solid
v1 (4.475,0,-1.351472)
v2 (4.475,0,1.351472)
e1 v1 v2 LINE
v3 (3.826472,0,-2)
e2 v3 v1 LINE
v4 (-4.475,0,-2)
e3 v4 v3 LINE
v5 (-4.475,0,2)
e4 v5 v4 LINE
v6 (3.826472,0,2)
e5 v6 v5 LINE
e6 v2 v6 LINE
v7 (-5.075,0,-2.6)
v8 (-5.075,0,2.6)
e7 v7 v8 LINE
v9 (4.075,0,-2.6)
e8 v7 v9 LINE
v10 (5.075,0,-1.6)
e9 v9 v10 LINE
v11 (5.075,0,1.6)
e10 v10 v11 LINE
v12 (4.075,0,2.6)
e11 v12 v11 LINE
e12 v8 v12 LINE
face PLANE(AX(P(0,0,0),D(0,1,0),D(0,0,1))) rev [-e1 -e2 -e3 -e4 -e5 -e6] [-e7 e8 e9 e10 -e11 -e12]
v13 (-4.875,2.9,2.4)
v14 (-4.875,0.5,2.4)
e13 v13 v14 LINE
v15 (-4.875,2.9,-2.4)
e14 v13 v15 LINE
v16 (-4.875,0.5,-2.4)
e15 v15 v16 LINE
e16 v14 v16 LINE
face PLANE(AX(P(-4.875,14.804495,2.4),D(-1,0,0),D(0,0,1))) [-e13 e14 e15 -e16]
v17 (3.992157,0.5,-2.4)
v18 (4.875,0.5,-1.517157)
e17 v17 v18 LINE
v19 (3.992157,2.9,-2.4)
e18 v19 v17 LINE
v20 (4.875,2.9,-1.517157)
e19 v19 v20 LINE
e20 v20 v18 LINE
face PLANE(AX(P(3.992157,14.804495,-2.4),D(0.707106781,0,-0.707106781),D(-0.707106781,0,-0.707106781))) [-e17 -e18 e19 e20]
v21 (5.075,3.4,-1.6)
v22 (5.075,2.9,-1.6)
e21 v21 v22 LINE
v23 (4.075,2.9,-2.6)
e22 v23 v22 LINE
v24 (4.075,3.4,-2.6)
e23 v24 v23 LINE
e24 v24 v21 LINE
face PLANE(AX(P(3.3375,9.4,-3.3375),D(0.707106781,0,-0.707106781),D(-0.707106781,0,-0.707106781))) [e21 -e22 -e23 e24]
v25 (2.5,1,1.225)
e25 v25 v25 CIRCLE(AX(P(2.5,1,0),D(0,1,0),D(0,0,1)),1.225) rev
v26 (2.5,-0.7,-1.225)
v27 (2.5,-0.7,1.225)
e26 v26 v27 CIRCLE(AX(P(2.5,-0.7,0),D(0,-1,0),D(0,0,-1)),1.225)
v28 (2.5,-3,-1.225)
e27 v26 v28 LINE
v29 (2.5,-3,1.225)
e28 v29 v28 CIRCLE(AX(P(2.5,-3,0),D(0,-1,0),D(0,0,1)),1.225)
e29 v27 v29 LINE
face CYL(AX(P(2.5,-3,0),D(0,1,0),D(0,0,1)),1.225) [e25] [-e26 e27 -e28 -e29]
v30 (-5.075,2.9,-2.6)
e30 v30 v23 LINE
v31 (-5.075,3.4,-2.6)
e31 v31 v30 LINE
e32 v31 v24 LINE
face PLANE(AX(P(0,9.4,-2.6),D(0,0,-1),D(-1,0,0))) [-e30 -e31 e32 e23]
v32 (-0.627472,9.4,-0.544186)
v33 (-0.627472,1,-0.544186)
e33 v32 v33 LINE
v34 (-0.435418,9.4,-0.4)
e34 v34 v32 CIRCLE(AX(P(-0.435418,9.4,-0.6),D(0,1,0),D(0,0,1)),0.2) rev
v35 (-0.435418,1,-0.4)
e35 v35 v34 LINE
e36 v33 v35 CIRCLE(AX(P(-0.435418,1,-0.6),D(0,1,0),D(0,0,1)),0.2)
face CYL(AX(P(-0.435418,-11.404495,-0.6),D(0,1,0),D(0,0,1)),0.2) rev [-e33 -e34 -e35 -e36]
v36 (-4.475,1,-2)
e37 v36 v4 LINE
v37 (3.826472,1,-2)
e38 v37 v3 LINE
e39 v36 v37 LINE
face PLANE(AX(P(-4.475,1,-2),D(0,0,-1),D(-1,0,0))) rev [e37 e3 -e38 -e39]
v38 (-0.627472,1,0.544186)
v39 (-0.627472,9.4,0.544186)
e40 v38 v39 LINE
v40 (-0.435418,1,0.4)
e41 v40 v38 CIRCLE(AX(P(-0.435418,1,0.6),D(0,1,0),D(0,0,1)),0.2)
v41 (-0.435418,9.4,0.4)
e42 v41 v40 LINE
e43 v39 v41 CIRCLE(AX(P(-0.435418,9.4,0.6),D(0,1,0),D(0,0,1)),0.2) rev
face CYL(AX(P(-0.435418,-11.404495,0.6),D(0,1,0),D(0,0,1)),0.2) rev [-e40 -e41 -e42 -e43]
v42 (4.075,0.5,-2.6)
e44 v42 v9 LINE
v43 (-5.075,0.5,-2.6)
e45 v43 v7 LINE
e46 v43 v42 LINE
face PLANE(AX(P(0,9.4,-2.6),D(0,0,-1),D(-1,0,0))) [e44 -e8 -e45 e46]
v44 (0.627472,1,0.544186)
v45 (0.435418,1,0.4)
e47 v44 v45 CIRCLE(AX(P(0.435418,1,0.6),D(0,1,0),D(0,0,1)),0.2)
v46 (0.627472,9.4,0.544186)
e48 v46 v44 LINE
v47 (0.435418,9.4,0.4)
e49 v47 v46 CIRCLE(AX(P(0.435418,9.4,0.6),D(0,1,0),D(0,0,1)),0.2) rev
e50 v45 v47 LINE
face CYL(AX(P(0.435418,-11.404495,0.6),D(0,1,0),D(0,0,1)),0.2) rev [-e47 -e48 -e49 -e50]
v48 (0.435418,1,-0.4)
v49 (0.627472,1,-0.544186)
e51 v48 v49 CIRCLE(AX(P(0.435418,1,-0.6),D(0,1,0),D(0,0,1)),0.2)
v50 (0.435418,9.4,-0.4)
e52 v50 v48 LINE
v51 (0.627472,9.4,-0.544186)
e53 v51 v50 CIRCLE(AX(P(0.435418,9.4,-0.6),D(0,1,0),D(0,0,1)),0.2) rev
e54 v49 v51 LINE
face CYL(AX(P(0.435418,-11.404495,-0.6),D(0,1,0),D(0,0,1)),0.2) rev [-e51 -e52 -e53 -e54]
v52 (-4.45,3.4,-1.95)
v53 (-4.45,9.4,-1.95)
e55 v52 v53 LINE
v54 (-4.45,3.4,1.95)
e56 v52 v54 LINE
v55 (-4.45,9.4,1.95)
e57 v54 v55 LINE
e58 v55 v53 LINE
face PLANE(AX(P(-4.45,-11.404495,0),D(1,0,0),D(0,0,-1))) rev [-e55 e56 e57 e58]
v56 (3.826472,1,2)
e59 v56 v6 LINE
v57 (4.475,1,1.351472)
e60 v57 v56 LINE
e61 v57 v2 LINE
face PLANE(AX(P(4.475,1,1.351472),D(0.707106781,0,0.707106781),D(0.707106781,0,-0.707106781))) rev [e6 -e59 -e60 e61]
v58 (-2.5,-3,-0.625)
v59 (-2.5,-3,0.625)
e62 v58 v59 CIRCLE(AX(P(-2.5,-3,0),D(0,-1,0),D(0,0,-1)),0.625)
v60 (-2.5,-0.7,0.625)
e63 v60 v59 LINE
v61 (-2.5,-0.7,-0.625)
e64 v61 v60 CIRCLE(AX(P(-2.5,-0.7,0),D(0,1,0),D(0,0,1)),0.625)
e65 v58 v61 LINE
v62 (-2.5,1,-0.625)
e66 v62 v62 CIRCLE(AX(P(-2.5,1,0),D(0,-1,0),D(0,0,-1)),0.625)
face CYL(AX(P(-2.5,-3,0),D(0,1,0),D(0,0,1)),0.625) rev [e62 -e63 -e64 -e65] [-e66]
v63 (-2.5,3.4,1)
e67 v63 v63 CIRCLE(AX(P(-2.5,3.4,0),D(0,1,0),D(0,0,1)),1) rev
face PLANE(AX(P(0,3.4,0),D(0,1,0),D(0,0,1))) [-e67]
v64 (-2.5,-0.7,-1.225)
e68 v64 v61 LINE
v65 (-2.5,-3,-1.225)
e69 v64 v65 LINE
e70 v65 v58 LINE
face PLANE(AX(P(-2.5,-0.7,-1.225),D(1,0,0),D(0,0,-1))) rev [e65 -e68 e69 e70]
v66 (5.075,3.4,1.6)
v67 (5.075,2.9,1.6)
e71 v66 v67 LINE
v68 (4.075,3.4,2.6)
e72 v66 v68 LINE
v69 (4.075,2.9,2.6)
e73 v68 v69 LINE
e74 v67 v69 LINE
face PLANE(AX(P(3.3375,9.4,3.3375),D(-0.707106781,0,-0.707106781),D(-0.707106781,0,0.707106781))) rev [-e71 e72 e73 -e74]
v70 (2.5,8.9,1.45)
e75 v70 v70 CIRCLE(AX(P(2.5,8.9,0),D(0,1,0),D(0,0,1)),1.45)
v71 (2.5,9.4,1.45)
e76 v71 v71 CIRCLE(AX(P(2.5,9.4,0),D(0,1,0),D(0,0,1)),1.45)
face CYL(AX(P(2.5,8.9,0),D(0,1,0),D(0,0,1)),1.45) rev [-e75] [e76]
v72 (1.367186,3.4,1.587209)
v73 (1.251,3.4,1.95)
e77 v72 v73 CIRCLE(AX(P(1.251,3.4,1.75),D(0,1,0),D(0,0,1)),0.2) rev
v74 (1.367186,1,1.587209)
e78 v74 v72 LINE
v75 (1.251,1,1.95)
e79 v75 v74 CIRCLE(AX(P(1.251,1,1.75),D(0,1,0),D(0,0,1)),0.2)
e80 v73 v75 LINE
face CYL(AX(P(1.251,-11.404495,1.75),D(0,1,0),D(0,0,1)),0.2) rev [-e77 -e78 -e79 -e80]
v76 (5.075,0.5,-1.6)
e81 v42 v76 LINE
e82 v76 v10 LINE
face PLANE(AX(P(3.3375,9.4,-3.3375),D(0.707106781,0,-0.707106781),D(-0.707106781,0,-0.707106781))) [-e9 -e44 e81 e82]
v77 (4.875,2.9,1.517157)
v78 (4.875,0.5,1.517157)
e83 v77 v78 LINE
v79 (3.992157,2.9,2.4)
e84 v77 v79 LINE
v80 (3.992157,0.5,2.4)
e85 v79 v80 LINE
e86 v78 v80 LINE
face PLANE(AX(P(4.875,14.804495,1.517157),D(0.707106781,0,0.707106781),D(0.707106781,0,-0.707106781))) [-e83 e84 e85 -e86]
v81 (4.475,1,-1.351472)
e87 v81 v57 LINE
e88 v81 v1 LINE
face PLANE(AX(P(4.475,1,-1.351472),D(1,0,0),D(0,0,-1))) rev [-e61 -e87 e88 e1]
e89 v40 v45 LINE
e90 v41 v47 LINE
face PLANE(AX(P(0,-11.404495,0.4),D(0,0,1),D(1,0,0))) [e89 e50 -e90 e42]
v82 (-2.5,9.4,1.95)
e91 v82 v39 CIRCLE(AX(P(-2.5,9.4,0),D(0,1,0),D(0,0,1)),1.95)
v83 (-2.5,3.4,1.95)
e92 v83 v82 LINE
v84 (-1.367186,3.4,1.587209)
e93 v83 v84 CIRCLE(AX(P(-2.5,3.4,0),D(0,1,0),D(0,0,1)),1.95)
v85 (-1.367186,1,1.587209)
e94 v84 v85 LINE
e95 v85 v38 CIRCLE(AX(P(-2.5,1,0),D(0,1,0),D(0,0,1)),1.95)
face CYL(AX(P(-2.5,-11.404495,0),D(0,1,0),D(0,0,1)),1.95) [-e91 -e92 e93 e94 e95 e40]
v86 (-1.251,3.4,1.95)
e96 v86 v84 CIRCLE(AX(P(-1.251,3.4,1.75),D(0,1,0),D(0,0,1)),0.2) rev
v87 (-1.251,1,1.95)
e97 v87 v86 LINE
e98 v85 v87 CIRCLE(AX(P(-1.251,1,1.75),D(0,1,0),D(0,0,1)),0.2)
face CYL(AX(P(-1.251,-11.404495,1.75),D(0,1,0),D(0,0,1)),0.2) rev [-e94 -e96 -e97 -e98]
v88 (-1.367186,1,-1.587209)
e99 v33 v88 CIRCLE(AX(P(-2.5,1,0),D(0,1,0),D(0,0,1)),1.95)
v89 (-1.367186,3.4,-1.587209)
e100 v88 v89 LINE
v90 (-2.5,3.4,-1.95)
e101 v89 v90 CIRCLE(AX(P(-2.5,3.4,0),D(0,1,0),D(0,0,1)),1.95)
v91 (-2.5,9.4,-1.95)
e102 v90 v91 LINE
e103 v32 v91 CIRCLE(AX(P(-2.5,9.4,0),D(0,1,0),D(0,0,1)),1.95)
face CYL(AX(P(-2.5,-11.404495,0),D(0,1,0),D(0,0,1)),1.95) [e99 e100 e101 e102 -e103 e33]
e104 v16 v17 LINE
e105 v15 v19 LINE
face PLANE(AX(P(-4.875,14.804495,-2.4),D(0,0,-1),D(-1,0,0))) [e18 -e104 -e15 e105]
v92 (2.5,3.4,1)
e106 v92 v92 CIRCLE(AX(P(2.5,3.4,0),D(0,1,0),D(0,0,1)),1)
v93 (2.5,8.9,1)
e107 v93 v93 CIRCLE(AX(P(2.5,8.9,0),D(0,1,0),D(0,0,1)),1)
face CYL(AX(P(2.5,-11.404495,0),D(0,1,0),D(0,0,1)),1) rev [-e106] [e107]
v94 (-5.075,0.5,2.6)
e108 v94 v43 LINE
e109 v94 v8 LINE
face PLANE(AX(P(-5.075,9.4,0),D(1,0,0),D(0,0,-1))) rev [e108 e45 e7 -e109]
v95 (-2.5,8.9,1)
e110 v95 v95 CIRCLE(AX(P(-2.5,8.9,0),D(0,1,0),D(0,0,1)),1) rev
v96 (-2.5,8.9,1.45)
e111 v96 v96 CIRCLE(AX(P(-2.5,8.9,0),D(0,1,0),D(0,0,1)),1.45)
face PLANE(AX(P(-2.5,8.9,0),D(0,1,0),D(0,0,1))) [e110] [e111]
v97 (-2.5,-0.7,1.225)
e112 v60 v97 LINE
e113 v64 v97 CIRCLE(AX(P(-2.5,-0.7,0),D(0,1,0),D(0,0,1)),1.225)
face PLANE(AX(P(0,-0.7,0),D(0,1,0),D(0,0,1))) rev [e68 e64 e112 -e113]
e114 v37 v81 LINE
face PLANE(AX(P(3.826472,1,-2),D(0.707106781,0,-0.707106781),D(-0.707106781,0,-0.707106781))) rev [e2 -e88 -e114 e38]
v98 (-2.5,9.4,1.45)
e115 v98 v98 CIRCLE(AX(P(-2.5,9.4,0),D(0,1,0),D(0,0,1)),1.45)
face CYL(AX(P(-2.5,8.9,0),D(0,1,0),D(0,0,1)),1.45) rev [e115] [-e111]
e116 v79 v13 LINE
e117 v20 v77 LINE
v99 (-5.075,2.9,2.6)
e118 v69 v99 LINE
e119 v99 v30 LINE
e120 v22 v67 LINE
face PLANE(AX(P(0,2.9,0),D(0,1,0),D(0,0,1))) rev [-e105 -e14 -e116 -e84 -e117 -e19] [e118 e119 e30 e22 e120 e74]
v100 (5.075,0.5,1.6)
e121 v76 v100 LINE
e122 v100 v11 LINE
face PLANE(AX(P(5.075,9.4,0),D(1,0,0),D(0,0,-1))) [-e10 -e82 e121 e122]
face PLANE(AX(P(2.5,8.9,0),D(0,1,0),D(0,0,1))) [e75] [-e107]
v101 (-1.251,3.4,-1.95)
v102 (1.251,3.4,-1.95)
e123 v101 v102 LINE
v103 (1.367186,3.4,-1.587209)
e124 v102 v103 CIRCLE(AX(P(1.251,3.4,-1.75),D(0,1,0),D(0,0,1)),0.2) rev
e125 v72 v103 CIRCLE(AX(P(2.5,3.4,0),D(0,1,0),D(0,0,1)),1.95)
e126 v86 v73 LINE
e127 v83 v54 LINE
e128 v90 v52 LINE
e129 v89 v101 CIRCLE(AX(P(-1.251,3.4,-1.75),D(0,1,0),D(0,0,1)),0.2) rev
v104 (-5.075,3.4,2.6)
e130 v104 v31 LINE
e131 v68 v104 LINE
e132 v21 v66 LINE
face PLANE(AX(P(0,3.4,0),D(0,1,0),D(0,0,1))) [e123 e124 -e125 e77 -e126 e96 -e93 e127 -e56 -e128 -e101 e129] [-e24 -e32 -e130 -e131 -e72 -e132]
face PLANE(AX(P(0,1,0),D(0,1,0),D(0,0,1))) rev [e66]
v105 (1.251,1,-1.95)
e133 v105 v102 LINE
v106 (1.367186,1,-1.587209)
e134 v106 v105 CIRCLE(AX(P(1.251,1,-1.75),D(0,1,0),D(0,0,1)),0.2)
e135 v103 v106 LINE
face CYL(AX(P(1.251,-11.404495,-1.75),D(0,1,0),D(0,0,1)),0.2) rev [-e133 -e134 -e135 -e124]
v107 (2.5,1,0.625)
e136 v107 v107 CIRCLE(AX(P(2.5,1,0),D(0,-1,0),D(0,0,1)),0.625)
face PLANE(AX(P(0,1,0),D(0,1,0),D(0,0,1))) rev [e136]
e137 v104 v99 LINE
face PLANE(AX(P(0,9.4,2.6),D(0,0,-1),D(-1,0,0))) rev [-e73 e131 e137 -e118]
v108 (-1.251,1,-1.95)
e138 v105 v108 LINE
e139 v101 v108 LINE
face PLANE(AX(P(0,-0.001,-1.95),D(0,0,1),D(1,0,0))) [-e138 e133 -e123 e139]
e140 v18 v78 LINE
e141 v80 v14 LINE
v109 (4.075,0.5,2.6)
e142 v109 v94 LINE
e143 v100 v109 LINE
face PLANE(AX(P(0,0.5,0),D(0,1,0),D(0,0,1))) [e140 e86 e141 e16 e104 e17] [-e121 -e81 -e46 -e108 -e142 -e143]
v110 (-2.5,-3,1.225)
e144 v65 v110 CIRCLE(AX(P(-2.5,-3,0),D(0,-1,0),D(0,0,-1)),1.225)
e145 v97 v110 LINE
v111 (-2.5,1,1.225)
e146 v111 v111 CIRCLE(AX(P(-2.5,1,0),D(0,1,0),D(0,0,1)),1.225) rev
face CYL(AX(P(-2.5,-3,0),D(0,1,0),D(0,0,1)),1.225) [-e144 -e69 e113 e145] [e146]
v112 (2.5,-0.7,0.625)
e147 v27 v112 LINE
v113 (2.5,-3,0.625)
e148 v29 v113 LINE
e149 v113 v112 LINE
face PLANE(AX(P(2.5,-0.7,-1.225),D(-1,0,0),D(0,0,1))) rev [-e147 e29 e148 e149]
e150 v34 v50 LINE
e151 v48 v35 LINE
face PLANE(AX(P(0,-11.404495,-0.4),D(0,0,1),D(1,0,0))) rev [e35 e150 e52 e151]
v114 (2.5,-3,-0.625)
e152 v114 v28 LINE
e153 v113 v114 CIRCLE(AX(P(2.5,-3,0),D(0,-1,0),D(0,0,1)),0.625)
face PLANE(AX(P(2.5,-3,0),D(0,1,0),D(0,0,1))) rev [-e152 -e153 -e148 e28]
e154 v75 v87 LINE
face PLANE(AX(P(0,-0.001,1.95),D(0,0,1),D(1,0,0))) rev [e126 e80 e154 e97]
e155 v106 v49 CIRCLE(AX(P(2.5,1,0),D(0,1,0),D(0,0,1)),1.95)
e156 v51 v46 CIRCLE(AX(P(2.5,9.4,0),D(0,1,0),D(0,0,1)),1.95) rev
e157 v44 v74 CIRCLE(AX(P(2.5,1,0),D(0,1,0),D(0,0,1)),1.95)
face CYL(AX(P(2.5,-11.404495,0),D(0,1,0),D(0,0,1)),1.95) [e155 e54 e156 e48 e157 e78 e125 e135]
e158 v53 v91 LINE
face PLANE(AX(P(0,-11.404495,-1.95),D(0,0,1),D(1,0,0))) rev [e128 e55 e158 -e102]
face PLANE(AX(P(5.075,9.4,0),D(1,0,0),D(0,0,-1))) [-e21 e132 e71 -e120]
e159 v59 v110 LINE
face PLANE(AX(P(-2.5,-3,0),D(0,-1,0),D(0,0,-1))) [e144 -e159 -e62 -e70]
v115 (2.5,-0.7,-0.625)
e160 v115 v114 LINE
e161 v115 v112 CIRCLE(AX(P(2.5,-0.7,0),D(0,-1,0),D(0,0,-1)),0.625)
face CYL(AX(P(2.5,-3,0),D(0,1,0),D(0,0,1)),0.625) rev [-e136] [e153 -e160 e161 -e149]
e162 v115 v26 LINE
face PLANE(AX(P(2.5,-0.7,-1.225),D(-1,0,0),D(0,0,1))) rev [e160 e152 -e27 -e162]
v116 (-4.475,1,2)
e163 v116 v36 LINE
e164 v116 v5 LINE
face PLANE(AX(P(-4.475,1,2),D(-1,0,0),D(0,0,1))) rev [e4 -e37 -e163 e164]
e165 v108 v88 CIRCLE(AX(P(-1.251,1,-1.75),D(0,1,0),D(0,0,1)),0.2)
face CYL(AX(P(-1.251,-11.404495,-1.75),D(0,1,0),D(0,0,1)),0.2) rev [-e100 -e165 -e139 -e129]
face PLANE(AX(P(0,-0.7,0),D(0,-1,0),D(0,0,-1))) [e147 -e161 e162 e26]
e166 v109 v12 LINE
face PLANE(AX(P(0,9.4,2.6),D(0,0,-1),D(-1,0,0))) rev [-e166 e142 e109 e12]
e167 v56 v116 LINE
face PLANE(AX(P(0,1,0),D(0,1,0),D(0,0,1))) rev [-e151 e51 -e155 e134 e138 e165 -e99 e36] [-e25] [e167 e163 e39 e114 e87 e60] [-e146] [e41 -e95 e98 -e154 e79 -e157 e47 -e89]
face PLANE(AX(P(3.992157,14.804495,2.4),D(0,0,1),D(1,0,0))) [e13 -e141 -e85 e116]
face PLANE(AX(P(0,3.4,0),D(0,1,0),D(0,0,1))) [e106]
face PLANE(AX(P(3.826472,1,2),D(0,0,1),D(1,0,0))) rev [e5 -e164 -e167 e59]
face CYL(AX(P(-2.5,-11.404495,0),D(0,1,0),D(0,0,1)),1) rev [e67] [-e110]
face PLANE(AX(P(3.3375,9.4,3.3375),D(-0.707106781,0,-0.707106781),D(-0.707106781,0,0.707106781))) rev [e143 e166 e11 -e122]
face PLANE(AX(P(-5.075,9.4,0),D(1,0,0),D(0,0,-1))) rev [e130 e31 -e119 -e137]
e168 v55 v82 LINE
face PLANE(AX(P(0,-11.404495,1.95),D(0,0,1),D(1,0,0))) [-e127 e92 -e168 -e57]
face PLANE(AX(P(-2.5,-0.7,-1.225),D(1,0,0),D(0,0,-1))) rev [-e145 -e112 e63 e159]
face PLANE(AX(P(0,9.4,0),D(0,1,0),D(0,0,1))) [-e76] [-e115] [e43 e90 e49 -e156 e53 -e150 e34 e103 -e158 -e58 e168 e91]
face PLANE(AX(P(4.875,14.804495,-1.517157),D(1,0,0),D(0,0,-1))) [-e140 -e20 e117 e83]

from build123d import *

# Parameters (mm, degrees)
BOSS_EXTRUDE1_DEPTH = 9.4
SKETCH2_R           = 1
CUT_EXTRUDE1_DEPTH  = 6
SKETCH3_R           = 1.45
CUT_EXTRUDE2_DEPTH  = 0.5
CUT_EXTRUDE3_DEPTH  = 1
CUT_EXTRUDE4_REACH  = 10.277
FILLET1_START       = 1
FILLET1_DEPTH       = 2.4
FILLET1_START_2     = 3.146512
FILLET1_2_DEPTH     = 6.253488
SKETCH6_R           = 1.225
SKETCH6_R_2         = 0.625
BOSS_EXTRUDE2_DEPTH = 4
SKETCH7_W           = 1.225
SKETCH7_H           = 2.45
CUT_EXTRUDE5_DEPTH  = 2.3
CUT_EXTRUDE6_DEPTH  = 2.4


with BuildPart() as part:
    # Sketch1 → Boss-Extrude1 (new body)
    with BuildSketch(Plane(origin=(0, 0, 0), x_dir=(1, 0, 0), z_dir=(0, 1, 0))):
        Polygon((5.075, 1.6), (4.075, 2.6), (-5.075, 2.6), (-5.075, -2.6), (4.075, -2.6), (5.075, -1.6), align=None)
    extrude(amount=BOSS_EXTRUDE1_DEPTH)

    # Sketch2 → Cut-Extrude1 (cut)
    # profile 1 of 3: a face of its own
    with BuildSketch(Plane(origin=(0, 9.4, 0), x_dir=(1, 0, 0), z_dir=(0, 1, 0))):
        Polygon((4.075, -2.6), (5.075, -1.6), (5.075, 1.6), (4.075, 2.6), (-5.075, 2.6), (-5.075, -2.6), align=None)
        with BuildLine():
            Line((-2.5, -1.95), (-4.45, -1.95))
            Line((-4.45, -1.95), (-4.45, 1.95))
            Line((-4.45, 1.95), (-2.5, 1.95))
            ThreePointArc((-2.5, 1.95), (-1.270670915, 1.51368755), (-0.591466532, 0.4))
            Line((-0.591466532, 0.4), (0.591466532, 0.4))
            ThreePointArc((0.591466532, 0.4), (4.45, 0), (0.591466532, -0.4))
            Line((0.591466532, -0.4), (-0.591466532, -0.4))
            ThreePointArc((-0.591466532, -0.4), (-1.270670915, -1.51368755), (-2.5, -1.95))
        make_face(mode=Mode.SUBTRACT)
    # profile 2 of 3: a face of its own
    with BuildSketch(Plane(origin=(0, 9.4, 0), x_dir=(1, 0, 0), z_dir=(0, 1, 0))):
        with Locations(Location((2.5, 0, 0), (0, 0, 270))):
            Circle(SKETCH2_R)
    # profile 3 of 3: a face of its own
    with BuildSketch(Plane(origin=(0, 9.4, 0), x_dir=(1, 0, 0), z_dir=(0, 1, 0))):
        with Locations(Location((-2.5, 0, 0), (0, 0, 270))):
            Circle(SKETCH2_R)
    extrude(amount=-CUT_EXTRUDE1_DEPTH, mode=Mode.SUBTRACT)

    # Sketch3 → Cut-Extrude2 (cut)
    with BuildSketch(Plane(origin=(0, 9.4, 0), x_dir=(1, 0, 0), z_dir=(0, 1, 0))):
        with Locations(Location((-2.5, 0, 0), (0, 0, 270))):
            Circle(SKETCH3_R)
        with Locations(Location((2.5, 0, 0), (0, 0, 270))):
            Circle(SKETCH3_R)
    extrude(amount=-CUT_EXTRUDE2_DEPTH, mode=Mode.SUBTRACT)

    # Sketch4 → Cut-Extrude3 (cut)
    with BuildSketch(Plane.XZ):
        Polygon((3.826471863, 2), (-4.475, 2), (-4.475, -2), (3.826471863, -2), (4.475, -1.351471863), (4.475, 1.351471863), align=None)
    extrude(amount=-CUT_EXTRUDE3_DEPTH, mode=Mode.SUBTRACT)

    # Sketch5 → Cut-Extrude4 (cut, up to next)
    with BuildSketch(Plane(origin=(0, 3.4, 0), x_dir=(1, 0, 0), z_dir=(0, 1, 0)), mode=Mode.PRIVATE) as cut_extrude4_sk1:
        with BuildLine():
            Line((2.5, 1.95), (-2.5, 1.95))
            ThreePointArc((-2.5, 1.95), (-1.270670915, 1.51368755), (-0.591466532, 0.4))
            Line((-0.591466532, 0.4), (0.591466532, 0.4))
            ThreePointArc((0.591466532, 0.4), (1.270670915, 1.51368755), (2.5, 1.95))
        make_face()
    cut_extrude4_tool1 = extrude(cut_extrude4_sk1.sketch, amount=-CUT_EXTRUDE4_REACH, mode=Mode.PRIVATE) & part.part
    # Sketch5 → Cut-Extrude4 (cut, up to next)
    with BuildSketch(Plane(origin=(0, 3.4, 0), x_dir=(1, 0, 0), z_dir=(0, 1, 0)), mode=Mode.PRIVATE) as cut_extrude4_sk2:
        with BuildLine():
            Line((-2.5, -1.95), (2.5, -1.95))
            ThreePointArc((2.5, -1.95), (1.270670915, -1.51368755), (0.591466532, -0.4))
            Line((0.591466532, -0.4), (-0.591466532, -0.4))
            ThreePointArc((-0.591466532, -0.4), (-1.270670915, -1.51368755), (-2.5, -1.95))
        make_face()
    cut_extrude4_tool2 = extrude(cut_extrude4_sk2.sketch, amount=-CUT_EXTRUDE4_REACH, mode=Mode.PRIVATE) & part.part
    add(cut_extrude4_tool1.solids().sort_by_distance((0, 3.4, -1.344451))[0], mode=Mode.SUBTRACT)
    add(cut_extrude4_tool2.solids().sort_by_distance((0, 3.4, 1.344451))[0], mode=Mode.SUBTRACT)

    # Fillet1: read off the stored shape, not the designer's step
    # Fillet1 outline → Fillet1 (add)
    with BuildSketch(Plane(origin=(0, 0, 0), x_dir=(1, 0, 0), z_dir=(0, 1, 0)).offset(FILLET1_START)):
        with BuildLine():
            ThreePointArc((1.36718641, 1.587209302), (1.905255576, 1.85708887), (2.5, 1.95))
            Line((2.5, 1.95), (1.2510004, 1.95))
            ThreePointArc((1.2510004, 1.95), (1.441471054, 1.810999428), (1.36718641, 1.587209302))
        make_face()
        with BuildLine():
            ThreePointArc((1.36718641, -1.587209302), (1.441471054, -1.810999428), (1.2510004, -1.95))
            Line((1.2510004, -1.95), (2.5, -1.95))
            ThreePointArc((2.5, -1.95), (1.905255576, -1.85708887), (1.36718641, -1.587209302))
        make_face()
        with BuildLine():
            Line((-2.5, -1.95), (-1.2510004, -1.95))
            ThreePointArc((-1.2510004, -1.95), (-1.441471054, -1.810999428), (-1.36718641, -1.587209302))
            ThreePointArc((-1.36718641, -1.587209302), (-1.905255576, -1.857088869), (-2.5, -1.95))
        make_face()
        with BuildLine():
            ThreePointArc((0.435417718, -0.4), (0.555495212, -0.44005815), (0.627471884, -0.544186047))
            ThreePointArc((0.627471884, -0.544186047), (0.608095119, -0.472436154), (0.591466532, -0.4))
            Line((0.591466532, -0.4), (0.435417718, -0.4))
        make_face()
        with BuildLine():
            ThreePointArc((-0.591466532, -0.4), (-0.608095119, -0.472436154), (-0.627471884, -0.544186047))
            ThreePointArc((-0.627471884, -0.544186047), (-0.555495212, -0.44005815), (-0.435417718, -0.4))
            Line((-0.435417718, -0.4), (-0.591466532, -0.4))
        make_face()
        with BuildLine():
            ThreePointArc((-1.36718641, 1.587209302), (-1.441471054, 1.810999428), (-1.2510004, 1.95))
            Line((-1.2510004, 1.95), (-2.5, 1.95))
            ThreePointArc((-2.5, 1.95), (-1.905255576, 1.857088869), (-1.36718641, 1.587209302))
        make_face()
        with BuildLine():
            ThreePointArc((0.591466532, 0.4), (0.608095119, 0.472436154), (0.627471884, 0.544186047))
            ThreePointArc((0.627471884, 0.544186047), (0.555495212, 0.44005815), (0.435417718, 0.4))
            Line((0.435417718, 0.4), (0.591466532, 0.4))
        make_face()
        with BuildLine():
            ThreePointArc((-0.435417718, 0.4), (-0.555495212, 0.44005815), (-0.627471884, 0.544186047))
            ThreePointArc((-0.627471884, 0.544186047), (-0.608095119, 0.472436154), (-0.591466532, 0.4))
            Line((-0.591466532, 0.4), (-0.435417718, 0.4))
        make_face()
    extrude(amount=FILLET1_DEPTH)

    # Fillet1 2 outline → Fillet1 2 (add)
    with BuildSketch(Plane(origin=(0, 0, 0), x_dir=(1, 0, 0), z_dir=(0, 1, 0)).offset(FILLET1_START_2)):
        with BuildLine():
            ThreePointArc((0.435417718, -0.4), (0.555495212, -0.44005815), (0.627471884, -0.544186047))
            ThreePointArc((0.627471884, -0.544186047), (0.608095119, -0.472436154), (0.591466532, -0.4))
            Line((0.591466532, -0.4), (0.435417718, -0.4))
        make_face()
        with BuildLine():
            ThreePointArc((-0.591466532, -0.4), (-0.608095119, -0.472436154), (-0.627471884, -0.544186047))
            ThreePointArc((-0.627471884, -0.544186047), (-0.555495212, -0.44005815), (-0.435417718, -0.4))
            Line((-0.435417718, -0.4), (-0.591466532, -0.4))
        make_face()
        with BuildLine():
            ThreePointArc((0.591466532, 0.4), (0.608095119, 0.472436154), (0.627471884, 0.544186047))
            ThreePointArc((0.627471884, 0.544186047), (0.555495212, 0.44005815), (0.435417718, 0.4))
            Line((0.435417718, 0.4), (0.591466532, 0.4))
        make_face()
        with BuildLine():
            ThreePointArc((-0.435417718, 0.4), (-0.555495212, 0.44005815), (-0.627471884, 0.544186047))
            ThreePointArc((-0.627471884, 0.544186047), (-0.608095119, 0.472436154), (-0.591466532, 0.4))
            Line((-0.591466532, 0.4), (-0.435417718, 0.4))
        make_face()
    extrude(amount=FILLET1_2_DEPTH)

    # Sketch6 → Boss-Extrude2 (add)
    # profile 1 of 2: a face of its own
    with BuildSketch(Plane.XZ.offset(-1)):
        with Locations(Location((-2.5, 0, 0), (0, 0, 90))):
            Circle(SKETCH6_R)
        with Locations(Location((-2.5, 0, 0), (0, 0, 270))):
            Circle(SKETCH6_R_2, mode=Mode.SUBTRACT)
    # profile 2 of 2: a face of its own
    with BuildSketch(Plane.XZ.offset(-1)):
        with Locations(Location((2.5, 0, 0), (0, 0, 90))):
            Circle(SKETCH6_R)
        with Locations(Location((2.5, 0, 0), (0, 0, 90))):
            Circle(SKETCH6_R_2, mode=Mode.SUBTRACT)
    extrude(amount=BOSS_EXTRUDE2_DEPTH)

    # Sketch7 → Cut-Extrude5 (cut)
    with BuildSketch(Plane.XZ.offset(3)):
        with Locations((-3.1125, 0)):
            Rectangle(SKETCH7_W, SKETCH7_H)
        with Locations((3.1125, 0)):
            Rectangle(SKETCH7_W, SKETCH7_H)
    extrude(amount=-CUT_EXTRUDE5_DEPTH, mode=Mode.SUBTRACT)

    # Sketch8 → Cut-Extrude6 (cut)
    with BuildSketch(Plane(origin=(0, 0.5, 0), x_dir=(-1, 0, 0), z_dir=(0, -1, 0))):
        Polygon((-4.075, -2.6), (5.075, -2.6), (5.075, 2.6), (-4.075, 2.6), (-5.075, 1.6), (-5.075, -1.6), align=None)
        Polygon((-3.992157288, -2.4), (4.875, -2.4), (4.875, 2.4), (-3.992157288, 2.4), (-4.875, 1.517157288), (-4.875, -1.517157288), align=None, mode=Mode.SUBTRACT)
    extrude(amount=-CUT_EXTRUDE6_DEPTH, mode=Mode.SUBTRACT)


solid = part.part
